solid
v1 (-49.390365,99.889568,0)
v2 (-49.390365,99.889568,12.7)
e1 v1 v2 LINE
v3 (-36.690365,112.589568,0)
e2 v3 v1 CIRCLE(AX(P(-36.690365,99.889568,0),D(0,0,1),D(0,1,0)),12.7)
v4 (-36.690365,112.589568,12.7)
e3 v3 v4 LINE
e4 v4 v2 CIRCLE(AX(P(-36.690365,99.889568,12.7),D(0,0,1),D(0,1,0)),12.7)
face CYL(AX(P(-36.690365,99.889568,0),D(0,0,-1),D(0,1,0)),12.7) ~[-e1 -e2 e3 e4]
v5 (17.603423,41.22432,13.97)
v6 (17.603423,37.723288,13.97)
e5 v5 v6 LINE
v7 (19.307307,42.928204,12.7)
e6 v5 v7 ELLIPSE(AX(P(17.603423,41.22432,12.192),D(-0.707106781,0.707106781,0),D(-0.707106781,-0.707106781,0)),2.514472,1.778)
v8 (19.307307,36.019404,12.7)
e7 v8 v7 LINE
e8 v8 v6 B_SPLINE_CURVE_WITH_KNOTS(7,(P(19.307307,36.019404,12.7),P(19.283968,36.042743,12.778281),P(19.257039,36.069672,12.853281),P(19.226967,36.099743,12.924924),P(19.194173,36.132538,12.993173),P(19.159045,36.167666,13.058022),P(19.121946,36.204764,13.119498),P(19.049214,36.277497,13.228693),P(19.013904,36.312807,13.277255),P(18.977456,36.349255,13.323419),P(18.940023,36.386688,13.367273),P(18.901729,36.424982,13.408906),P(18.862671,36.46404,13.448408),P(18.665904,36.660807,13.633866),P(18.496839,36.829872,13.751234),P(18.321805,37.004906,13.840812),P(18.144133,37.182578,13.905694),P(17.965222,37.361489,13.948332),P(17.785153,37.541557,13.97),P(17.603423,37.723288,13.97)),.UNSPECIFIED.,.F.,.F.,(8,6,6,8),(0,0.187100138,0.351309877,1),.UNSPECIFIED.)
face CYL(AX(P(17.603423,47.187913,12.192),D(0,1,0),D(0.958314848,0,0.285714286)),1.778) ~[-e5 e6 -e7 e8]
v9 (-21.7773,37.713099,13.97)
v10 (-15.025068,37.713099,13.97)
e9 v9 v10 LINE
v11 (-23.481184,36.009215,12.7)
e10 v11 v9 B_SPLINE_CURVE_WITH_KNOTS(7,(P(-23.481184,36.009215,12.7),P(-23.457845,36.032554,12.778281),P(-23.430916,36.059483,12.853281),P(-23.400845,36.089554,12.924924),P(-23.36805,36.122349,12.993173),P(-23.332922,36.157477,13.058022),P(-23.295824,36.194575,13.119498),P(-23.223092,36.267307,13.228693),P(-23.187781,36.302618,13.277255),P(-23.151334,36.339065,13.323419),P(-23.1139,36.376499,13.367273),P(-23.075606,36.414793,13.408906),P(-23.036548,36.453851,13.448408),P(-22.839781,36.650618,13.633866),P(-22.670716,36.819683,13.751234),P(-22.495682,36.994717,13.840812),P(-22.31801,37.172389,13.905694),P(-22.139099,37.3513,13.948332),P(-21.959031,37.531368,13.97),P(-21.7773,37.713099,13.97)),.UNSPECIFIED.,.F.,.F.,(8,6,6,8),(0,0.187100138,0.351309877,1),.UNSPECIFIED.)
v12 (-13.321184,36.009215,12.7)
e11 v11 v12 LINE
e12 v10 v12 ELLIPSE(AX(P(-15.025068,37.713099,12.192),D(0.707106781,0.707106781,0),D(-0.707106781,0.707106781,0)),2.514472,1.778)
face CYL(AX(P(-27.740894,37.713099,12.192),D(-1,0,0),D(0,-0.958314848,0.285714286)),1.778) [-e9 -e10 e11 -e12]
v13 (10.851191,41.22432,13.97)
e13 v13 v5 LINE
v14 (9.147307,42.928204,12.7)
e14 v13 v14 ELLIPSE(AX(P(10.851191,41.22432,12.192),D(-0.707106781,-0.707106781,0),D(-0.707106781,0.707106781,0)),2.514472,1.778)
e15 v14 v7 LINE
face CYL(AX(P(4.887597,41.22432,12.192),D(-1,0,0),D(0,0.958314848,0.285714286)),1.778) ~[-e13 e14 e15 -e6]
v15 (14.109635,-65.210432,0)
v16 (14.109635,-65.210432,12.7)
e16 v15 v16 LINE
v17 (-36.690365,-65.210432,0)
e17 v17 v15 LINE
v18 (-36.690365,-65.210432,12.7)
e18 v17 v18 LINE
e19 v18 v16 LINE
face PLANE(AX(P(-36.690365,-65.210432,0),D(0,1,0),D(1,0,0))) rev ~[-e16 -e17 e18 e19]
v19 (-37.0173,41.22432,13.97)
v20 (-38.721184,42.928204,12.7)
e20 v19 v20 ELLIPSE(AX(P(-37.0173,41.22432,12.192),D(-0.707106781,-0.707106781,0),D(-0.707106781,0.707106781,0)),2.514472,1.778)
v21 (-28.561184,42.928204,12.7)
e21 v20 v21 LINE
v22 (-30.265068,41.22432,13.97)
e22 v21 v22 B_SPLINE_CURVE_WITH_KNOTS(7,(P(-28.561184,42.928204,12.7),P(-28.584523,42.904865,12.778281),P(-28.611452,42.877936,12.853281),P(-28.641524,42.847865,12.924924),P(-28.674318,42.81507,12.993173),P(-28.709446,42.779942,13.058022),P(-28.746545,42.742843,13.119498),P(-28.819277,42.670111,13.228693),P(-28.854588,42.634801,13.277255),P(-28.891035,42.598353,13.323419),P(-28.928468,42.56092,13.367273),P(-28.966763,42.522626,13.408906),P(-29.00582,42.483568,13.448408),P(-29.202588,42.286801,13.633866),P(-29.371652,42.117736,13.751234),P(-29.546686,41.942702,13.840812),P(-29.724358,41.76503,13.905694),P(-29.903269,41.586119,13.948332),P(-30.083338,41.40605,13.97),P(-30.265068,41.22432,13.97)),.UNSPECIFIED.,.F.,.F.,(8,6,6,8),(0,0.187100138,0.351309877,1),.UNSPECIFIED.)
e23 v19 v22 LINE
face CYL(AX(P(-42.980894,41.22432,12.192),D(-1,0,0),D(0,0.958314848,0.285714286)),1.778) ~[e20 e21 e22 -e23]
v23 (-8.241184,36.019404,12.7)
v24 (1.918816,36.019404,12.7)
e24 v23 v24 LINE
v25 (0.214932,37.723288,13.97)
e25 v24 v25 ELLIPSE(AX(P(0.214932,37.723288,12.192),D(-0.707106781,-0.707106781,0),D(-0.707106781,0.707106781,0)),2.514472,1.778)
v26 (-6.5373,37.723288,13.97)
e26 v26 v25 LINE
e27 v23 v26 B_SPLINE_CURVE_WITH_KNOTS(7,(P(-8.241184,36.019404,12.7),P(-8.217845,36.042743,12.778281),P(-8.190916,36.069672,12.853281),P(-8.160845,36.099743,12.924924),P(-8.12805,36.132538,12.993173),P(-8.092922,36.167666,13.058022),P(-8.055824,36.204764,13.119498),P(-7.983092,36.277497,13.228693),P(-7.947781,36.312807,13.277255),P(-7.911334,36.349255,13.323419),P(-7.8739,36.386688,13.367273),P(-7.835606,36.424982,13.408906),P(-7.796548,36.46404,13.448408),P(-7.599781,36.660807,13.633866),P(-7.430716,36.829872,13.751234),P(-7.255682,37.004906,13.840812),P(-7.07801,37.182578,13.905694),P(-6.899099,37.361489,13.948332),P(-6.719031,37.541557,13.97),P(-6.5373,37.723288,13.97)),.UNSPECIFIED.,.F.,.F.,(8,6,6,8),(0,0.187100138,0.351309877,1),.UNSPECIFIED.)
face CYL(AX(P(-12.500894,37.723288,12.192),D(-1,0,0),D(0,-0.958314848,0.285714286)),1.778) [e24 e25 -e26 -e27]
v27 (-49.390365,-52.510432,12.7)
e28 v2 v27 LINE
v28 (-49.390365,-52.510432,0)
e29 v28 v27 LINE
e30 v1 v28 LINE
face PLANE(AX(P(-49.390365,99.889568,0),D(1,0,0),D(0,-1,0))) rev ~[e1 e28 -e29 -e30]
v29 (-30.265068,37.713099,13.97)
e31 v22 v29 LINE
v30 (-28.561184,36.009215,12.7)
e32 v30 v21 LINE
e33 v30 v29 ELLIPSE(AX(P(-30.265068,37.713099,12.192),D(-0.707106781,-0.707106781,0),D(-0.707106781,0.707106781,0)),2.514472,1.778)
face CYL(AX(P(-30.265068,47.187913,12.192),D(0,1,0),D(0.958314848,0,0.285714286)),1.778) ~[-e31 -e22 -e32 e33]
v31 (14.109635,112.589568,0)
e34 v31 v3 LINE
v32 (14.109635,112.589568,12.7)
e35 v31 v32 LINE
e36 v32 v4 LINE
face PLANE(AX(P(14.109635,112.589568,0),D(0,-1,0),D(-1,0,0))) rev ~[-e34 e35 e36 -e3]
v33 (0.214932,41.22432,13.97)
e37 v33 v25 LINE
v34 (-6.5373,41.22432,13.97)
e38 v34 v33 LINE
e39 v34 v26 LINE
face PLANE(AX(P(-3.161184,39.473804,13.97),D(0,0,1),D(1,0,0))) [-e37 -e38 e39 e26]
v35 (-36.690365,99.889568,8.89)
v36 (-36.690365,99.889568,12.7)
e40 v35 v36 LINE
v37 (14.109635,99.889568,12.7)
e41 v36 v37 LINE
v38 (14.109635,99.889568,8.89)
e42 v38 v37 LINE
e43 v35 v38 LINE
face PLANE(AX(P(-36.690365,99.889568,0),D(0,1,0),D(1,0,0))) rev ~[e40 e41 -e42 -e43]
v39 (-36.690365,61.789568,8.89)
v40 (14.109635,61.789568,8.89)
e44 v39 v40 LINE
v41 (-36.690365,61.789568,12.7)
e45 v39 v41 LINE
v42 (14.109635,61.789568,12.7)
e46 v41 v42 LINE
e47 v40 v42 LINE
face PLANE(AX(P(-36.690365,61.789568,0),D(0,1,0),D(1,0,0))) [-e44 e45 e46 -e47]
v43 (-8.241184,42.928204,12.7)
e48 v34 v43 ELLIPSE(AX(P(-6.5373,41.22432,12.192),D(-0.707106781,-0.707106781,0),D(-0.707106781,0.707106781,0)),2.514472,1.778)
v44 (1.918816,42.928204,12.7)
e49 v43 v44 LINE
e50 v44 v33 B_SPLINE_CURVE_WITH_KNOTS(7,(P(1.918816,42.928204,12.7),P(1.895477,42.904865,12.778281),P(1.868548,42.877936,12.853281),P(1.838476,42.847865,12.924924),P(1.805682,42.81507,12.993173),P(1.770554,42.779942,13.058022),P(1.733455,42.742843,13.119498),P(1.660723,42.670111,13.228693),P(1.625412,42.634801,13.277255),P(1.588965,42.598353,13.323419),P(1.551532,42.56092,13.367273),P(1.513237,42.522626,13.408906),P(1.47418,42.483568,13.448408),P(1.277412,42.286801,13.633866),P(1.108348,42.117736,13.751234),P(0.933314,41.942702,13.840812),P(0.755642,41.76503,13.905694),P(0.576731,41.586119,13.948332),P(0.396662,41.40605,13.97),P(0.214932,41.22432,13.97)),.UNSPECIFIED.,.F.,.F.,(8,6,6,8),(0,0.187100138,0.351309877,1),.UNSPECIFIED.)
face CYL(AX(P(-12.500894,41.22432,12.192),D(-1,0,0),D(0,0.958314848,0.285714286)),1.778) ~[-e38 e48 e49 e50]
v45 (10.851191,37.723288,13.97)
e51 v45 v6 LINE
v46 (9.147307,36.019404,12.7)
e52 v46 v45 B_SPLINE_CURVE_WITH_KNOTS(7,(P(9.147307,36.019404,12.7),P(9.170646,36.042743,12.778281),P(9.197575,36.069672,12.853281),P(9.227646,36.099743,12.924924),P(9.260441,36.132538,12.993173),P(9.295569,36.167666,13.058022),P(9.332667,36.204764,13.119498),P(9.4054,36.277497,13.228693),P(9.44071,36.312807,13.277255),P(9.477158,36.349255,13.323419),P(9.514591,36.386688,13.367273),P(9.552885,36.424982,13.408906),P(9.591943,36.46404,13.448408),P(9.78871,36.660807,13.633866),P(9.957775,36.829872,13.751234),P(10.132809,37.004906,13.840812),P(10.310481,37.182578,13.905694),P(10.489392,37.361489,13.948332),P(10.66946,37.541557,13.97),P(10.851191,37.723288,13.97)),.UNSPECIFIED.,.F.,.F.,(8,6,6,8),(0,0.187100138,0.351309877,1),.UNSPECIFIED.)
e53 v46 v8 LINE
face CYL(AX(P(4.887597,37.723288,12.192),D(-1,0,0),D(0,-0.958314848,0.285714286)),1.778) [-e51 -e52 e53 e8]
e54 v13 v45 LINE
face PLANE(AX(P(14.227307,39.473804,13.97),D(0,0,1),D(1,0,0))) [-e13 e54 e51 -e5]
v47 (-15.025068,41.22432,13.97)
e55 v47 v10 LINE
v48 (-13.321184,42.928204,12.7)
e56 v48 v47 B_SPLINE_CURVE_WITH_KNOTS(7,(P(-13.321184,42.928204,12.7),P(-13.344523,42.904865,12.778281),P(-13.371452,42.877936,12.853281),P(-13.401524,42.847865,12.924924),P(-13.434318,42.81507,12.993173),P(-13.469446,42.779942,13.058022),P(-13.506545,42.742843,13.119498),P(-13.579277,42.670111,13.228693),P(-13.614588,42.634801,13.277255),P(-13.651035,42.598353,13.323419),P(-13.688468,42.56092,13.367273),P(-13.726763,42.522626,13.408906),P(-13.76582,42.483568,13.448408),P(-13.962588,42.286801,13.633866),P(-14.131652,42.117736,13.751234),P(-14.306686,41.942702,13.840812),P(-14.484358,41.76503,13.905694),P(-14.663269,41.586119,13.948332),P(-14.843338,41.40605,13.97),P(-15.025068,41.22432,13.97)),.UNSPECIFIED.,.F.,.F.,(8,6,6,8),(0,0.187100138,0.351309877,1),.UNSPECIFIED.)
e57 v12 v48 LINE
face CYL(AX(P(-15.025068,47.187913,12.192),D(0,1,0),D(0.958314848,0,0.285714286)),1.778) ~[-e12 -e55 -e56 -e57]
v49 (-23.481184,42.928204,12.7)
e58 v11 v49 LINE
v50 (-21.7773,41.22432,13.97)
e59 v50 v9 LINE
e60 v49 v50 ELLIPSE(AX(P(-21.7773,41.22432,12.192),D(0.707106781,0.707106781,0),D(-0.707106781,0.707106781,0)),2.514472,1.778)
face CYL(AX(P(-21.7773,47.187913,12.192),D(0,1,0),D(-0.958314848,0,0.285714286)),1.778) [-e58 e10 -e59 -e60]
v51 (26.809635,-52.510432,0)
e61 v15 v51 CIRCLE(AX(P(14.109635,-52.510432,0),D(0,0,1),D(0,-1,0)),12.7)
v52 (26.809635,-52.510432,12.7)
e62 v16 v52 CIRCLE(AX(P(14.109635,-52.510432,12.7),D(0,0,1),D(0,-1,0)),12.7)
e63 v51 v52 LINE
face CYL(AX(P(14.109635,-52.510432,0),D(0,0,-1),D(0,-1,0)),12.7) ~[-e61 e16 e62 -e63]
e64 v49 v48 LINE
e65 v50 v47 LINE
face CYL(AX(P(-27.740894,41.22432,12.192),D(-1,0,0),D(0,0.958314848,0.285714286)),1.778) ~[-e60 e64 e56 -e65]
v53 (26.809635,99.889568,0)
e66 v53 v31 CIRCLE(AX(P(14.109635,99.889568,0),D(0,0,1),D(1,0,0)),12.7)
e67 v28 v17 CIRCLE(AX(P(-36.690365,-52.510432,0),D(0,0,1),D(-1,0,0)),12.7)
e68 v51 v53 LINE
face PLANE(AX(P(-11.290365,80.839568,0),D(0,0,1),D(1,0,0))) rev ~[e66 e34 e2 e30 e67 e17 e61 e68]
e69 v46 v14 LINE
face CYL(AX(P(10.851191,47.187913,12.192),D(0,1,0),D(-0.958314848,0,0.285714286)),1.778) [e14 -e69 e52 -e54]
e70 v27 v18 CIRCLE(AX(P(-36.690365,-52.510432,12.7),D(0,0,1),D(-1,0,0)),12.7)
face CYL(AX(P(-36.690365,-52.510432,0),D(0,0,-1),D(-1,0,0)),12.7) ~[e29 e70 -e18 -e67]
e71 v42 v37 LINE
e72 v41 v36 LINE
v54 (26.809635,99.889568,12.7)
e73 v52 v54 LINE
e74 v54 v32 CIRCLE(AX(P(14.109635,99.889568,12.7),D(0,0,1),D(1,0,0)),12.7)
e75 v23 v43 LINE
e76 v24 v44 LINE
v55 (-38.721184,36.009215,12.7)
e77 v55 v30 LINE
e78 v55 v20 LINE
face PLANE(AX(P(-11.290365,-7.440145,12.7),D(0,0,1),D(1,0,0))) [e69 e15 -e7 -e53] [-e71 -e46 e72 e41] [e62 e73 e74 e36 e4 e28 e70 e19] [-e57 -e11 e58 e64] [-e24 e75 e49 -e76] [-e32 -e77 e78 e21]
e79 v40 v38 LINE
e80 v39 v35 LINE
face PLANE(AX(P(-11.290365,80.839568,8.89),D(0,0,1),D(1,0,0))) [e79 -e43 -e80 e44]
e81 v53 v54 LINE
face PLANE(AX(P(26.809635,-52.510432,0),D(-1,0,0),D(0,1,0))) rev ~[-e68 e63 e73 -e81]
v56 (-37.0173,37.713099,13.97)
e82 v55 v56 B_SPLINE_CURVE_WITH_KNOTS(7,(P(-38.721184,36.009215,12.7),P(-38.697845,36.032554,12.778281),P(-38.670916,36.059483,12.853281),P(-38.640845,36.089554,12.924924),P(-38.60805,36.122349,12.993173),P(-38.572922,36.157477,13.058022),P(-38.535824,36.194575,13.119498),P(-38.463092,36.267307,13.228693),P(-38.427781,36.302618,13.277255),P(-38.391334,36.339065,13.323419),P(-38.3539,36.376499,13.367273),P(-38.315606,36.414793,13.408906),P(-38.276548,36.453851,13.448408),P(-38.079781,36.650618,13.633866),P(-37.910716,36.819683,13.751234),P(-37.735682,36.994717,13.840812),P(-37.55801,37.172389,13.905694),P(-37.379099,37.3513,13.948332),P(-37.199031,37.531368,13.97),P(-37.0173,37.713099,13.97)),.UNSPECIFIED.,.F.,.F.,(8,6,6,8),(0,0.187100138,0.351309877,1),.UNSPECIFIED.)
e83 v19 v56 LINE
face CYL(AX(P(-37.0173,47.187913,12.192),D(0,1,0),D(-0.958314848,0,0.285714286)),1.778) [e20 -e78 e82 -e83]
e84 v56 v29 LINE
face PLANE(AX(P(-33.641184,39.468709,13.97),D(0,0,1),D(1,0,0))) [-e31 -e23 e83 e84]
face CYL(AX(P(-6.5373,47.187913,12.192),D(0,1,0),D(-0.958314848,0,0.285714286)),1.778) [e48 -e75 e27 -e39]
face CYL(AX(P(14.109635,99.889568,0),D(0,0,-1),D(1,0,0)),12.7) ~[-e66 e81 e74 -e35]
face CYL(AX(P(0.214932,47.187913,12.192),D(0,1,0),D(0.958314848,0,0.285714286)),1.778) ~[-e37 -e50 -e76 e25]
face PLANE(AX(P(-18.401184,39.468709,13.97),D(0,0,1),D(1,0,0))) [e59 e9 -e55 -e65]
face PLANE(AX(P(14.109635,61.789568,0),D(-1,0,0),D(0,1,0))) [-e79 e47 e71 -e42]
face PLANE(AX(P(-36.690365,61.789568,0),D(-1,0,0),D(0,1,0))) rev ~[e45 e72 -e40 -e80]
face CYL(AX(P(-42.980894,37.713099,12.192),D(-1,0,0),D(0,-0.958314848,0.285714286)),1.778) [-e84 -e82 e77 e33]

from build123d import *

# Parameters (mm, degrees)
F0_W        = 50.8
F0_H        = 38.1
F1_DEPTH    = 12.7
F2_DEPTH    = 8.89
F3_W        = 10.16
F3_H        = 6.9189891219
F3_H_2      = 6.9088
F4_DEPTH    = 1.27
F5_T1_DEPTH = 18.6794189943
F5_T3_DEPTH = 15.4384081162
F6_T1_DEPTH = 15.4384081162
F6_T3_DEPTH = 18.6794189943
F6_T5_DEPTH = 18.6794189943
F6_T7_DEPTH = 18.6794189943
F6_T9_DEPTH = 15.4282189943


# Not quite as in the source:
# - a fillet or chamfer that OpenCascade refuses, or shapes differently, is made with other operations: its cross-section is extruded or revolved along the edge and cut away or added


with BuildPart() as f1:
    # F0 (on Top) → F1 (new body)
    with BuildSketch(Plane.XY):
        with BuildLine():
            Line((26.8096346408, 46.6933250427), (-49.3903653592, 46.6933250427))
            Line((-49.3903653592, 46.6933250427), (-49.3903653592, -52.5104318142))
            ThreePointArc((-49.3903653592, -52.5104318142), (-45.6706214803, -61.4906879353), (-36.6903653592, -65.2104318142))
            Line((-36.6903653592, -65.2104318142), (14.1096346408, -65.2104318142))
            ThreePointArc((14.1096346408, -65.2104318142), (23.0898907619, -61.4906879353), (26.8096346408, -52.5104318142))
            Line((26.8096346408, -52.5104318142), (26.8096346408, 46.6933250427))
        make_face()
        with BuildLine():
            Line((14.1096346408, 112.5895681858), (-36.6903653592, 112.5895681858))
            ThreePointArc((-36.6903653592, 112.5895681858), (-45.6706214803, 108.8698243069), (-49.3903653592, 99.8895681858))
            Line((-49.3903653592, 99.8895681858), (-49.3903653592, 46.6933250427))
            Line((-49.3903653592, 46.6933250427), (26.8096346408, 46.6933250427))
            Line((26.8096346408, 46.6933250427), (26.8096346408, 99.8895681858))
            ThreePointArc((26.8096346408, 99.8895681858), (23.0898907619, 108.8698243069), (14.1096346408, 112.5895681858))
        make_face()
        with Locations((-11.2903653592, 80.8395681858)):
            Rectangle(F0_W, F0_H, mode=Mode.SUBTRACT)
    extrude(amount=F1_DEPTH)

    # F0 (on Top) → F2 (join)
    with BuildSketch(Plane.XY):
        with Locations((-11.2903653592, 80.8395681858)):
            Rectangle(F0_W, F0_H)
    extrude(amount=F2_DEPTH)

    # F3 (on face) → F4 (join)
    with BuildSketch(Plane.XY.offset(12.7)):
        with Locations((-33.6411841828, 39.4687093794)):
            Rectangle(F3_W, F3_H)
        with Locations((-18.4011841828, 39.4687093794)):
            Rectangle(F3_W, F3_H)
        with Locations((-3.1611841828, 39.4738039404)):
            Rectangle(F3_W, F3_H_2)
        with Locations((14.2273069042, 39.4738039404)):
            Rectangle(F3_W, F3_H_2)
    extrude(amount=F4_DEPTH)

    # F5: fillet of radius 1.778 on 4 edges, made by hand

    # F5_s2 → F5_t1 (cut)
    with BuildSketch(Plane.YZ.offset(-42.9808936799)):
        with BuildLine():
            ThreePointArc((42.9282039404, 12.7), (42.2868783752, 13.6175714644), (41.2243201415, 13.97))
            Line((41.2243201415, 13.97), (42.9282039404, 13.97))
            Line((42.9282039404, 13.97), (42.9282039404, 12.7))
        make_face()
        with BuildLine():
            ThreePointArc((36.0092148185, 12.7), (36.6505403836, 13.6175714644), (37.7130986173, 13.97))
            Line((37.7130986173, 13.97), (36.0092148185, 13.97))
            Line((36.0092148185, 13.97), (36.0092148185, 12.7))
        make_face()
    extrude(amount=F5_T1_DEPTH, mode=Mode.SUBTRACT)

    # F5_s4 → F5_t3 (cut)
    with BuildSketch(Plane.XZ.offset(-47.1879134375)):
        with BuildLine():
            ThreePointArc((-38.7211841828, 12.7), (-38.0798586176, 13.6175714644), (-37.0173003839, 13.97))
            Line((-37.0173003839, 13.97), (-38.7211841828, 13.97))
            Line((-38.7211841828, 13.97), (-38.7211841828, 12.7))
        make_face()
        with BuildLine():
            ThreePointArc((-28.5611841828, 12.7), (-29.2025097479, 13.6175714644), (-30.2650679816, 13.97))
            Line((-30.2650679816, 13.97), (-28.5611841828, 13.97))
            Line((-28.5611841828, 13.97), (-28.5611841828, 12.7))
        make_face()
    extrude(amount=F5_T3_DEPTH, mode=Mode.SUBTRACT)

    # F6: fillet of radius 1.778 on 12 edges, made by hand

    # F6_s2 → F6_t1 (cut)
    with BuildSketch(Plane.XZ.offset(-47.1879134375)):
        with BuildLine():
            ThreePointArc((-23.4811841828, 12.7), (-22.8398586176, 13.6175714644), (-21.7773003839, 13.97))
            Line((-21.7773003839, 13.97), (-23.4811841828, 13.97))
            Line((-23.4811841828, 13.97), (-23.4811841828, 12.7))
        make_face()
        with BuildLine():
            ThreePointArc((-13.3211841828, 12.7), (-13.9625097479, 13.6175714644), (-15.0250679816, 13.97))
            Line((-15.0250679816, 13.97), (-13.3211841828, 13.97))
            Line((-13.3211841828, 13.97), (-13.3211841828, 12.7))
        make_face()
    extrude(amount=F6_T1_DEPTH, mode=Mode.SUBTRACT)

    # F6_s4 → F6_t3 (cut)
    with BuildSketch(Plane.YZ.offset(-27.7408936799)):
        with BuildLine():
            ThreePointArc((36.0092148185, 12.7), (36.6505403836, 13.6175714644), (37.7130986173, 13.97))
            Line((37.7130986173, 13.97), (36.0092148185, 13.97))
            Line((36.0092148185, 13.97), (36.0092148185, 12.7))
        make_face()
        with BuildLine():
            ThreePointArc((42.9282039404, 12.7), (42.2868783752, 13.6175714644), (41.2243201415, 13.97))
            Line((41.2243201415, 13.97), (42.9282039404, 13.97))
            Line((42.9282039404, 13.97), (42.9282039404, 12.7))
        make_face()
    extrude(amount=F6_T3_DEPTH, mode=Mode.SUBTRACT)

    # F6_s6 → F6_t5 (cut)
    with BuildSketch(Plane.YZ.offset(-12.5008936799)):
        with BuildLine():
            ThreePointArc((42.9282039404, 12.7), (42.2868783752, 13.6175714644), (41.2243201415, 13.97))
            Line((41.2243201415, 13.97), (42.9282039404, 13.97))
            Line((42.9282039404, 13.97), (42.9282039404, 12.7))
        make_face()
        with BuildLine():
            ThreePointArc((36.0194039404, 12.7), (36.6607295055, 13.6175714644), (37.7232877392, 13.97))
            Line((37.7232877392, 13.97), (36.0194039404, 13.97))
            Line((36.0194039404, 13.97), (36.0194039404, 12.7))
        make_face()
    extrude(amount=F6_T5_DEPTH, mode=Mode.SUBTRACT)

    # F6_s8 → F6_t7 (cut)
    with BuildSketch(Plane.YZ.offset(4.8875974071)):
        with BuildLine():
            ThreePointArc((42.9282039404, 12.7), (42.2868783752, 13.6175714644), (41.2243201415, 13.97))
            Line((41.2243201415, 13.97), (42.9282039404, 13.97))
            Line((42.9282039404, 13.97), (42.9282039404, 12.7))
        make_face()
        with BuildLine():
            ThreePointArc((36.0194039404, 12.7), (36.6607295055, 13.6175714644), (37.7232877392, 13.97))
            Line((37.7232877392, 13.97), (36.0194039404, 13.97))
            Line((36.0194039404, 13.97), (36.0194039404, 12.7))
        make_face()
    extrude(amount=F6_T7_DEPTH, mode=Mode.SUBTRACT)

    # F6_s10 → F6_t9 (cut)
    with BuildSketch(Plane.XZ.offset(-47.1879134375)):
        with BuildLine():
            ThreePointArc((9.1473069042, 12.7), (9.7886324694, 13.6175714644), (10.8511907031, 13.97))
            Line((10.8511907031, 13.97), (9.1473069042, 13.97))
            Line((9.1473069042, 13.97), (9.1473069042, 12.7))
        make_face()
        with BuildLine():
            ThreePointArc((19.3073069042, 12.7), (18.665981339, 13.6175714644), (17.6034231053, 13.97))
            Line((17.6034231053, 13.97), (19.3073069042, 13.97))
            Line((19.3073069042, 13.97), (19.3073069042, 12.7))
        make_face()
        with BuildLine():
            ThreePointArc((-8.2411841828, 12.7), (-7.5998586176, 13.6175714644), (-6.5373003839, 13.97))
            Line((-6.5373003839, 13.97), (-8.2411841828, 13.97))
            Line((-8.2411841828, 13.97), (-8.2411841828, 12.7))
        make_face()
        with BuildLine():
            ThreePointArc((1.9188158172, 12.7), (1.2774902521, 13.6175714644), (0.2149320184, 13.97))
            Line((0.2149320184, 13.97), (1.9188158172, 13.97))
            Line((1.9188158172, 13.97), (1.9188158172, 12.7))
        make_face()
    extrude(amount=F6_T9_DEPTH, mode=Mode.SUBTRACT)


solid = f1.part
